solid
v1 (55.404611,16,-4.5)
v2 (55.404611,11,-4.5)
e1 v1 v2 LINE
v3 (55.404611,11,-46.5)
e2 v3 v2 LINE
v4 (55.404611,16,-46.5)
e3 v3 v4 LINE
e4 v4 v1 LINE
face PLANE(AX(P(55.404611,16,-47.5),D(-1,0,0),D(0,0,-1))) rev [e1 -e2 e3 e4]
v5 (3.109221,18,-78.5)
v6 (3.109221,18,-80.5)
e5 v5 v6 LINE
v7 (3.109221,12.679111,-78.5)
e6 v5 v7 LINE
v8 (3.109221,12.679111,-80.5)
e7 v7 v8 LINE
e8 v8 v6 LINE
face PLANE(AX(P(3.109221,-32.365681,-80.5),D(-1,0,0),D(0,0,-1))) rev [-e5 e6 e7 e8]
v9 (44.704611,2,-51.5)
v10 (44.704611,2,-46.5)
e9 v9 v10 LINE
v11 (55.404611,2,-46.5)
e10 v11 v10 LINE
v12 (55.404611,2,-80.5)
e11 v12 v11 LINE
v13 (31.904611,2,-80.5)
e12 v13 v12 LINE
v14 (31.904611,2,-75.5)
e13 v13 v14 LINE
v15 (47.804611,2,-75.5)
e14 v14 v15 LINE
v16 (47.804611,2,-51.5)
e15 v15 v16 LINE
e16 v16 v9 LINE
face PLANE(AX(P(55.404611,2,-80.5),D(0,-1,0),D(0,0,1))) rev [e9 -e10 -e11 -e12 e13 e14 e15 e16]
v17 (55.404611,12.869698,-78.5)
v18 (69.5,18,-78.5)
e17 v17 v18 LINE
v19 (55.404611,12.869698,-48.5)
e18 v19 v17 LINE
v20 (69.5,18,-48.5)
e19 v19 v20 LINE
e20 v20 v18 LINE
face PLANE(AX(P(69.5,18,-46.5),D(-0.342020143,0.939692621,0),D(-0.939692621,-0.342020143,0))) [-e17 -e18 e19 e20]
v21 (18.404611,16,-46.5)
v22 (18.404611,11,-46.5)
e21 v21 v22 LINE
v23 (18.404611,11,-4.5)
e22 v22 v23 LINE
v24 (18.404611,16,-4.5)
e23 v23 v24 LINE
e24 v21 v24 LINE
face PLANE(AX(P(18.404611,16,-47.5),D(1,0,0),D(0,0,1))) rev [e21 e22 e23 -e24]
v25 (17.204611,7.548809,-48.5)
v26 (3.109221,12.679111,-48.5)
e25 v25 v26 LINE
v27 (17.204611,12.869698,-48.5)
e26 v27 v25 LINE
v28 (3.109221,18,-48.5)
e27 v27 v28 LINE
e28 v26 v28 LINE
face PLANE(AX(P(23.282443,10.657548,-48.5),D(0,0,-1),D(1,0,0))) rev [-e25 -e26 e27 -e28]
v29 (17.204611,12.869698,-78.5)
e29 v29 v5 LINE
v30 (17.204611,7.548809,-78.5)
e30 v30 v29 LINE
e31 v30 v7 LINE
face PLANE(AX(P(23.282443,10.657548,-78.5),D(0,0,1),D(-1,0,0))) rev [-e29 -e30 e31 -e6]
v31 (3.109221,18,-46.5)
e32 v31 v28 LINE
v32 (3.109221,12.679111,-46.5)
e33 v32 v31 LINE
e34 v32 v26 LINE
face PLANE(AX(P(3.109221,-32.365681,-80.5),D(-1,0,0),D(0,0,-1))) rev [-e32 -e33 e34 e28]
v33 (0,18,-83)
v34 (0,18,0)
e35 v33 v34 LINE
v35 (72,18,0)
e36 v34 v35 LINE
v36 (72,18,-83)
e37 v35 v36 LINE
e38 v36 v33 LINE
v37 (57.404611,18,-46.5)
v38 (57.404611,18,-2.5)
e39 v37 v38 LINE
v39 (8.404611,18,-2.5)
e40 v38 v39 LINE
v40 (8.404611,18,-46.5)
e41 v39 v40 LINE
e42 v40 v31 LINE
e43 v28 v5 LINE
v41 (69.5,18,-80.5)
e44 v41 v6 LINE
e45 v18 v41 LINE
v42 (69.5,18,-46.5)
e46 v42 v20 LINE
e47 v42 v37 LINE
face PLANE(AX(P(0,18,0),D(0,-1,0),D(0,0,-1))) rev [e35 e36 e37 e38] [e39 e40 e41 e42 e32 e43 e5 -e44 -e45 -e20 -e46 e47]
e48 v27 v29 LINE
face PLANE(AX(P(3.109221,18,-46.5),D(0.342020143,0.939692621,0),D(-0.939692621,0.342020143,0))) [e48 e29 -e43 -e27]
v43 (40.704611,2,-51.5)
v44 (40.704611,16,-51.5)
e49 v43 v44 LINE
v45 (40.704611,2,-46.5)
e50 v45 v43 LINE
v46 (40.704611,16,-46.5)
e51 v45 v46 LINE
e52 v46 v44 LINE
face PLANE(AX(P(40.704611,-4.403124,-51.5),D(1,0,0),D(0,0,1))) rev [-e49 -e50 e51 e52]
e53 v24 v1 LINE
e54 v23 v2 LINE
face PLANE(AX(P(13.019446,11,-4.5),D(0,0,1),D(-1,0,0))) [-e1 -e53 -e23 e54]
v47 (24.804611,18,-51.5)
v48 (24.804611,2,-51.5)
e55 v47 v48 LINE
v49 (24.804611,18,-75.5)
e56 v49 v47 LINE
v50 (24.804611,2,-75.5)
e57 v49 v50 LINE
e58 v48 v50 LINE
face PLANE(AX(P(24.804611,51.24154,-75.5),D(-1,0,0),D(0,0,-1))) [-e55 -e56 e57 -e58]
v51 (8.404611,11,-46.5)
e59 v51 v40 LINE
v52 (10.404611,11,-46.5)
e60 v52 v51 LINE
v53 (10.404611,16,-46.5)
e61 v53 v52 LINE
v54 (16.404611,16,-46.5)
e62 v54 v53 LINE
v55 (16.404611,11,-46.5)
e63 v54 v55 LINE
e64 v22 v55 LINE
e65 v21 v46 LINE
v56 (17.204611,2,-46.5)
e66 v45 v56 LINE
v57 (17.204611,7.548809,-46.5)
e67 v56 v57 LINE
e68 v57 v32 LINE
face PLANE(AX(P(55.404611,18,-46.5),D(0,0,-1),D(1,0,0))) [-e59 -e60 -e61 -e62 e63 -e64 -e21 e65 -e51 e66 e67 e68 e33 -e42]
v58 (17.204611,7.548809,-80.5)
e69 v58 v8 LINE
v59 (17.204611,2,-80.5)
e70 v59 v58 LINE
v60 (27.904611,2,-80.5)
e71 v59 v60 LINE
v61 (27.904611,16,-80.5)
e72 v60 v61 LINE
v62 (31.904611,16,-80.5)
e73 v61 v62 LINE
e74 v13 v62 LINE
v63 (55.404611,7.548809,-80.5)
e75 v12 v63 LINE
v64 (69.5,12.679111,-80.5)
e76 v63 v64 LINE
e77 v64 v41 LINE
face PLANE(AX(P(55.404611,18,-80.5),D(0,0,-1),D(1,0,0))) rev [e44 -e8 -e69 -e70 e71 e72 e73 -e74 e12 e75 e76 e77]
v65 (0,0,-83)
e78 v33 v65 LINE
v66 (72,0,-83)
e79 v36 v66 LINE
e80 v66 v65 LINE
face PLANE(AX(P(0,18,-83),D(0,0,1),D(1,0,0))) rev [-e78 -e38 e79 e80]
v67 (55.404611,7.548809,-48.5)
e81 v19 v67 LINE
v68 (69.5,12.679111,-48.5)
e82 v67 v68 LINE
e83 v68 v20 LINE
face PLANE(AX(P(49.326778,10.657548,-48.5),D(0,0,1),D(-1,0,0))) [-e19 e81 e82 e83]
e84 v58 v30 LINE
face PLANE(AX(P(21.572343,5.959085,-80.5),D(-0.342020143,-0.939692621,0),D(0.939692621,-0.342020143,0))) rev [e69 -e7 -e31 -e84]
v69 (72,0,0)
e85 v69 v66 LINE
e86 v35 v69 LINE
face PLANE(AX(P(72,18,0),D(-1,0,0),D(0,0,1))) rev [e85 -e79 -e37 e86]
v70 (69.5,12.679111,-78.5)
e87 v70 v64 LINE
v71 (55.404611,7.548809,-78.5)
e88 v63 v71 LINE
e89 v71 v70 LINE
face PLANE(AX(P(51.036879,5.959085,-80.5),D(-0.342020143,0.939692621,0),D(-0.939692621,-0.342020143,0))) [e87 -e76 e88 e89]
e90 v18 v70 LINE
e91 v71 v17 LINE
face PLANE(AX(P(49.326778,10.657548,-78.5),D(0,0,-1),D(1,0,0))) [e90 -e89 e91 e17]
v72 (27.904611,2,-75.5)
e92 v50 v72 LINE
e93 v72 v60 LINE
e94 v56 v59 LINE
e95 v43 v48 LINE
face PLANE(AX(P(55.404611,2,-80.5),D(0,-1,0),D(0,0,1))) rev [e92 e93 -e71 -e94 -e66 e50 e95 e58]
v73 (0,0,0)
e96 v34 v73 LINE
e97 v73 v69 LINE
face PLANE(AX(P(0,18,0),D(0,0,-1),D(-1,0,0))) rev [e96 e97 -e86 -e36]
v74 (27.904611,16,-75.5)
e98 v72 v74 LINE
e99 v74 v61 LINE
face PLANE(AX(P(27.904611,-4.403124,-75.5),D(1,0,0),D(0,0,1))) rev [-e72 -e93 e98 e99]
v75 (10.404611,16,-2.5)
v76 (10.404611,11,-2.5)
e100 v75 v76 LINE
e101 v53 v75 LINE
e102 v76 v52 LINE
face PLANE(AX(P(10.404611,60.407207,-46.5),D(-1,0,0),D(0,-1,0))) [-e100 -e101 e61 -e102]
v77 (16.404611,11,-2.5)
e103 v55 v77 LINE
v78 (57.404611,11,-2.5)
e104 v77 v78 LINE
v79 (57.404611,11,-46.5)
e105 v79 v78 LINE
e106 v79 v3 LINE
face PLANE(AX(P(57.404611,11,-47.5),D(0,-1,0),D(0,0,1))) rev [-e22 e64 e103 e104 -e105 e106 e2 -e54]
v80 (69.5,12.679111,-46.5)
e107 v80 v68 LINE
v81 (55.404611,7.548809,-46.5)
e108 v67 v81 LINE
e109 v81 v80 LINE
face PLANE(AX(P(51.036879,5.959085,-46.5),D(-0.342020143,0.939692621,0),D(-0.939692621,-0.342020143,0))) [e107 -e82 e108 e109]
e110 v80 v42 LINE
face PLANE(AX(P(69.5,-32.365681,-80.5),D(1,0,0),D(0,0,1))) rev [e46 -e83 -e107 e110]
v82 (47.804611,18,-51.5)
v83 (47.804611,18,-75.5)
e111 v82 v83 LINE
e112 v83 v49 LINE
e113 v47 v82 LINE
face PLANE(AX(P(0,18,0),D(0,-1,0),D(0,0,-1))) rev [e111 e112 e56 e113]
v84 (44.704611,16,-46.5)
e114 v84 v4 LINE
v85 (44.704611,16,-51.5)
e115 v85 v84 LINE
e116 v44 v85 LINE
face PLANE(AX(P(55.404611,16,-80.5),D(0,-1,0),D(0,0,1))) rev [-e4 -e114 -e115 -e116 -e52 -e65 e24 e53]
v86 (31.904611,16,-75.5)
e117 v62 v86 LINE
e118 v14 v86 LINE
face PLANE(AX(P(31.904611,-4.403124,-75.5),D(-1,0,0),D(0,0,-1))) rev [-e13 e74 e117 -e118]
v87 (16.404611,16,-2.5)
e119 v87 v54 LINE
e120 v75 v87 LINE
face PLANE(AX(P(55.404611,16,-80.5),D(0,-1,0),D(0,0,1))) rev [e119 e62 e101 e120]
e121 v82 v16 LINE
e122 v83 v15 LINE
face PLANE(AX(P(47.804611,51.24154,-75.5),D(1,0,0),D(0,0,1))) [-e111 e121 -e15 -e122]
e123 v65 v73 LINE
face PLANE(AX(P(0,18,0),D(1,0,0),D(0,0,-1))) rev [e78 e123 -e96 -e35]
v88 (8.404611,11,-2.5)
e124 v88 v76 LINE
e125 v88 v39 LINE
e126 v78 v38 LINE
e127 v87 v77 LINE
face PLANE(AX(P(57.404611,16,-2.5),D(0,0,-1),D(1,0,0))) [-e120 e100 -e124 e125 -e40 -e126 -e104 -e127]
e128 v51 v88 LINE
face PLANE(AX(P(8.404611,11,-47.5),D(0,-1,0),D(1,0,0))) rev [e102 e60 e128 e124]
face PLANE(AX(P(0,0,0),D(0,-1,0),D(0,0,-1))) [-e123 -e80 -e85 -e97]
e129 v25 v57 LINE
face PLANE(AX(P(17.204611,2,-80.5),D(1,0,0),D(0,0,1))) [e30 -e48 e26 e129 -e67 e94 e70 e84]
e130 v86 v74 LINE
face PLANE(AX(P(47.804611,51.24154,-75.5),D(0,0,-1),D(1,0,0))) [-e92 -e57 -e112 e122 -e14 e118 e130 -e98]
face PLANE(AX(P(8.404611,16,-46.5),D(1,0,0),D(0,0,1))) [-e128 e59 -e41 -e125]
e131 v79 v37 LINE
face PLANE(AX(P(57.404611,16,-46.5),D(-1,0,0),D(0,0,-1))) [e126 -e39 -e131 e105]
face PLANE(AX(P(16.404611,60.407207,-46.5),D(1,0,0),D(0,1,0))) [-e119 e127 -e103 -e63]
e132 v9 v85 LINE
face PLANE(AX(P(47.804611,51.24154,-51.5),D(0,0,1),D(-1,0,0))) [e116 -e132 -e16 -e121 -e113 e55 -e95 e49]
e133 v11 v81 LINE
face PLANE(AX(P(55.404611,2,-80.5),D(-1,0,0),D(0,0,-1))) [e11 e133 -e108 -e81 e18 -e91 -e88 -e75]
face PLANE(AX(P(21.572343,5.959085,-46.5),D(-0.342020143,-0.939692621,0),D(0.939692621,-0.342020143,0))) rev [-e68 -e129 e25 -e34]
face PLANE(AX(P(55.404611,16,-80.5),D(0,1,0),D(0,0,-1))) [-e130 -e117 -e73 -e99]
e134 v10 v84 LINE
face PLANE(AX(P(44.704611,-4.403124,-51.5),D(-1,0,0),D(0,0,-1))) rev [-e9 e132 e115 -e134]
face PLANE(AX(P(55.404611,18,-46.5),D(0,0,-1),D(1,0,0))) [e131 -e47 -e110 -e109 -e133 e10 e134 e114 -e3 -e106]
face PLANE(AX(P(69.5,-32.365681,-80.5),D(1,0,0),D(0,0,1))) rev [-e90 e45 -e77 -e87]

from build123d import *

# Parameters (mm, degrees)
SKETCH1_W           = 72
SKETCH1_H           = 83
BOSS_EXTRUDE1_DEPTH = 18
CAVITY2_START       = -80.5
CAVITY2_DEPTH       = 34
CAVITY2_START_2     = -48.5
CAVITY2_2_DEPTH     = 46
CAVITY2_3_DEPTH     = 5
CAVITY2_START_3     = -51.5
CAVITY2_4_DEPTH     = 5
CAVITY2_START_4     = -4.5
CAVITY2_5_OUTLINE_W = 37
CAVITY2_5_OUTLINE_H = 5
CAVITY2_5_DEPTH     = 2
CAVITY2_6_DEPTH     = 2
CAVITY2_7_DEPTH     = 2


# Read off the part's stored shape, not the designer's step: Cavity2
with BuildPart() as part:
    # Sketch1 → Boss-Extrude1 (new body)
    with BuildSketch(Plane(origin=(0, 0, 0), x_dir=(1, 0, 0), z_dir=(0, 1, 0))):
        with Locations((36, 41.5)):
            Rectangle(SKETCH1_W, SKETCH1_H)
    extrude(amount=BOSS_EXTRUDE1_DEPTH)

    # Cavity2 outline → Cavity2 (cut)
    with BuildSketch(Plane.XY.offset(CAVITY2_START)):
        Polygon((55.404610688, 2), (55.404610688, 12.86969785), (69.5, 18), (47.804610688, 18), (47.804610688, 2), align=None)
        Polygon((24.804610688, 18), (3.109221376, 18), (17.204610688, 12.86969785), (17.204610688, 2), (24.804610688, 2), align=None)
    extrude(amount=CAVITY2_DEPTH, mode=Mode.SUBTRACT)

    # Cavity2 2 outline → Cavity2 2 (cut)
    with BuildSketch(Plane.XY.offset(CAVITY2_START_2)):
        Polygon((55.404610688, 11), (57.404610688, 11), (57.404610688, 18), (8.404610688, 18), (8.404610688, 11), (10.404610688, 11), (10.404610688, 16), (16.404610688, 16), (16.404610688, 11), (18.404610688, 11), (18.404610688, 16), (55.404610688, 16), align=None)
    extrude(amount=CAVITY2_2_DEPTH, mode=Mode.SUBTRACT)

    # Cavity2 3 outline → Cavity2 3 (cut)
    with BuildSketch(Plane.XY.offset(CAVITY2_START)):
        Polygon((47.804610688, 2), (47.804610688, 18), (24.804610688, 18), (24.804610688, 2), (27.904610688, 2), (27.904610688, 16), (31.904610688, 16), (31.904610688, 2), align=None)
    extrude(amount=CAVITY2_3_DEPTH, mode=Mode.SUBTRACT)

    # Cavity2 4 outline → Cavity2 4 (cut)
    with BuildSketch(Plane.XY.offset(CAVITY2_START_3)):
        Polygon((47.804610688, 2), (47.804610688, 18), (24.804610688, 18), (24.804610688, 2), (40.704610688, 2), (40.704610688, 16), (44.704610688, 16), (44.704610688, 2), align=None)
    extrude(amount=CAVITY2_4_DEPTH, mode=Mode.SUBTRACT)

    # Cavity2 5 outline → Cavity2 5 (cut)
    with BuildSketch(Plane.XY.offset(CAVITY2_START_4)):
        with Locations((36.904610688, 13.5)):
            Rectangle(CAVITY2_5_OUTLINE_W, CAVITY2_5_OUTLINE_H)
    extrude(amount=CAVITY2_5_DEPTH, mode=Mode.SUBTRACT)

    # Cavity2 6 outline → Cavity2 6 (cut)
    with BuildSketch(Plane.XY.offset(CAVITY2_START)):
        Polygon((55.404610688, 7.548808988), (69.5, 12.679111138), (69.5, 18), (55.404610688, 12.86969785), align=None)
        Polygon((3.109221376, 18), (3.109221376, 12.679111138), (17.204610688, 7.548808988), (17.204610688, 12.86969785), align=None)
    extrude(amount=CAVITY2_6_DEPTH, mode=Mode.SUBTRACT)

    # Cavity2 7 outline → Cavity2 7 (cut)
    with BuildSketch(Plane.XY.offset(CAVITY2_START_2)):
        Polygon((55.404610688, 7.548808988), (69.5, 12.679111138), (69.5, 18), (57.404610688, 13.597638319), (57.404610688, 11), (55.404610688, 11), align=None)
        Polygon((8.404610688, 11), (8.404610688, 16.072635912), (3.109221376, 18), (3.109221376, 12.679111138), (17.204610688, 7.548808988), (17.204610688, 11), (16.404610688, 11), (16.404610688, 13.160874037), (10.404610688, 15.344695443), (10.404610688, 11), align=None)
    extrude(amount=CAVITY2_7_DEPTH, mode=Mode.SUBTRACT)


solid = part.part
